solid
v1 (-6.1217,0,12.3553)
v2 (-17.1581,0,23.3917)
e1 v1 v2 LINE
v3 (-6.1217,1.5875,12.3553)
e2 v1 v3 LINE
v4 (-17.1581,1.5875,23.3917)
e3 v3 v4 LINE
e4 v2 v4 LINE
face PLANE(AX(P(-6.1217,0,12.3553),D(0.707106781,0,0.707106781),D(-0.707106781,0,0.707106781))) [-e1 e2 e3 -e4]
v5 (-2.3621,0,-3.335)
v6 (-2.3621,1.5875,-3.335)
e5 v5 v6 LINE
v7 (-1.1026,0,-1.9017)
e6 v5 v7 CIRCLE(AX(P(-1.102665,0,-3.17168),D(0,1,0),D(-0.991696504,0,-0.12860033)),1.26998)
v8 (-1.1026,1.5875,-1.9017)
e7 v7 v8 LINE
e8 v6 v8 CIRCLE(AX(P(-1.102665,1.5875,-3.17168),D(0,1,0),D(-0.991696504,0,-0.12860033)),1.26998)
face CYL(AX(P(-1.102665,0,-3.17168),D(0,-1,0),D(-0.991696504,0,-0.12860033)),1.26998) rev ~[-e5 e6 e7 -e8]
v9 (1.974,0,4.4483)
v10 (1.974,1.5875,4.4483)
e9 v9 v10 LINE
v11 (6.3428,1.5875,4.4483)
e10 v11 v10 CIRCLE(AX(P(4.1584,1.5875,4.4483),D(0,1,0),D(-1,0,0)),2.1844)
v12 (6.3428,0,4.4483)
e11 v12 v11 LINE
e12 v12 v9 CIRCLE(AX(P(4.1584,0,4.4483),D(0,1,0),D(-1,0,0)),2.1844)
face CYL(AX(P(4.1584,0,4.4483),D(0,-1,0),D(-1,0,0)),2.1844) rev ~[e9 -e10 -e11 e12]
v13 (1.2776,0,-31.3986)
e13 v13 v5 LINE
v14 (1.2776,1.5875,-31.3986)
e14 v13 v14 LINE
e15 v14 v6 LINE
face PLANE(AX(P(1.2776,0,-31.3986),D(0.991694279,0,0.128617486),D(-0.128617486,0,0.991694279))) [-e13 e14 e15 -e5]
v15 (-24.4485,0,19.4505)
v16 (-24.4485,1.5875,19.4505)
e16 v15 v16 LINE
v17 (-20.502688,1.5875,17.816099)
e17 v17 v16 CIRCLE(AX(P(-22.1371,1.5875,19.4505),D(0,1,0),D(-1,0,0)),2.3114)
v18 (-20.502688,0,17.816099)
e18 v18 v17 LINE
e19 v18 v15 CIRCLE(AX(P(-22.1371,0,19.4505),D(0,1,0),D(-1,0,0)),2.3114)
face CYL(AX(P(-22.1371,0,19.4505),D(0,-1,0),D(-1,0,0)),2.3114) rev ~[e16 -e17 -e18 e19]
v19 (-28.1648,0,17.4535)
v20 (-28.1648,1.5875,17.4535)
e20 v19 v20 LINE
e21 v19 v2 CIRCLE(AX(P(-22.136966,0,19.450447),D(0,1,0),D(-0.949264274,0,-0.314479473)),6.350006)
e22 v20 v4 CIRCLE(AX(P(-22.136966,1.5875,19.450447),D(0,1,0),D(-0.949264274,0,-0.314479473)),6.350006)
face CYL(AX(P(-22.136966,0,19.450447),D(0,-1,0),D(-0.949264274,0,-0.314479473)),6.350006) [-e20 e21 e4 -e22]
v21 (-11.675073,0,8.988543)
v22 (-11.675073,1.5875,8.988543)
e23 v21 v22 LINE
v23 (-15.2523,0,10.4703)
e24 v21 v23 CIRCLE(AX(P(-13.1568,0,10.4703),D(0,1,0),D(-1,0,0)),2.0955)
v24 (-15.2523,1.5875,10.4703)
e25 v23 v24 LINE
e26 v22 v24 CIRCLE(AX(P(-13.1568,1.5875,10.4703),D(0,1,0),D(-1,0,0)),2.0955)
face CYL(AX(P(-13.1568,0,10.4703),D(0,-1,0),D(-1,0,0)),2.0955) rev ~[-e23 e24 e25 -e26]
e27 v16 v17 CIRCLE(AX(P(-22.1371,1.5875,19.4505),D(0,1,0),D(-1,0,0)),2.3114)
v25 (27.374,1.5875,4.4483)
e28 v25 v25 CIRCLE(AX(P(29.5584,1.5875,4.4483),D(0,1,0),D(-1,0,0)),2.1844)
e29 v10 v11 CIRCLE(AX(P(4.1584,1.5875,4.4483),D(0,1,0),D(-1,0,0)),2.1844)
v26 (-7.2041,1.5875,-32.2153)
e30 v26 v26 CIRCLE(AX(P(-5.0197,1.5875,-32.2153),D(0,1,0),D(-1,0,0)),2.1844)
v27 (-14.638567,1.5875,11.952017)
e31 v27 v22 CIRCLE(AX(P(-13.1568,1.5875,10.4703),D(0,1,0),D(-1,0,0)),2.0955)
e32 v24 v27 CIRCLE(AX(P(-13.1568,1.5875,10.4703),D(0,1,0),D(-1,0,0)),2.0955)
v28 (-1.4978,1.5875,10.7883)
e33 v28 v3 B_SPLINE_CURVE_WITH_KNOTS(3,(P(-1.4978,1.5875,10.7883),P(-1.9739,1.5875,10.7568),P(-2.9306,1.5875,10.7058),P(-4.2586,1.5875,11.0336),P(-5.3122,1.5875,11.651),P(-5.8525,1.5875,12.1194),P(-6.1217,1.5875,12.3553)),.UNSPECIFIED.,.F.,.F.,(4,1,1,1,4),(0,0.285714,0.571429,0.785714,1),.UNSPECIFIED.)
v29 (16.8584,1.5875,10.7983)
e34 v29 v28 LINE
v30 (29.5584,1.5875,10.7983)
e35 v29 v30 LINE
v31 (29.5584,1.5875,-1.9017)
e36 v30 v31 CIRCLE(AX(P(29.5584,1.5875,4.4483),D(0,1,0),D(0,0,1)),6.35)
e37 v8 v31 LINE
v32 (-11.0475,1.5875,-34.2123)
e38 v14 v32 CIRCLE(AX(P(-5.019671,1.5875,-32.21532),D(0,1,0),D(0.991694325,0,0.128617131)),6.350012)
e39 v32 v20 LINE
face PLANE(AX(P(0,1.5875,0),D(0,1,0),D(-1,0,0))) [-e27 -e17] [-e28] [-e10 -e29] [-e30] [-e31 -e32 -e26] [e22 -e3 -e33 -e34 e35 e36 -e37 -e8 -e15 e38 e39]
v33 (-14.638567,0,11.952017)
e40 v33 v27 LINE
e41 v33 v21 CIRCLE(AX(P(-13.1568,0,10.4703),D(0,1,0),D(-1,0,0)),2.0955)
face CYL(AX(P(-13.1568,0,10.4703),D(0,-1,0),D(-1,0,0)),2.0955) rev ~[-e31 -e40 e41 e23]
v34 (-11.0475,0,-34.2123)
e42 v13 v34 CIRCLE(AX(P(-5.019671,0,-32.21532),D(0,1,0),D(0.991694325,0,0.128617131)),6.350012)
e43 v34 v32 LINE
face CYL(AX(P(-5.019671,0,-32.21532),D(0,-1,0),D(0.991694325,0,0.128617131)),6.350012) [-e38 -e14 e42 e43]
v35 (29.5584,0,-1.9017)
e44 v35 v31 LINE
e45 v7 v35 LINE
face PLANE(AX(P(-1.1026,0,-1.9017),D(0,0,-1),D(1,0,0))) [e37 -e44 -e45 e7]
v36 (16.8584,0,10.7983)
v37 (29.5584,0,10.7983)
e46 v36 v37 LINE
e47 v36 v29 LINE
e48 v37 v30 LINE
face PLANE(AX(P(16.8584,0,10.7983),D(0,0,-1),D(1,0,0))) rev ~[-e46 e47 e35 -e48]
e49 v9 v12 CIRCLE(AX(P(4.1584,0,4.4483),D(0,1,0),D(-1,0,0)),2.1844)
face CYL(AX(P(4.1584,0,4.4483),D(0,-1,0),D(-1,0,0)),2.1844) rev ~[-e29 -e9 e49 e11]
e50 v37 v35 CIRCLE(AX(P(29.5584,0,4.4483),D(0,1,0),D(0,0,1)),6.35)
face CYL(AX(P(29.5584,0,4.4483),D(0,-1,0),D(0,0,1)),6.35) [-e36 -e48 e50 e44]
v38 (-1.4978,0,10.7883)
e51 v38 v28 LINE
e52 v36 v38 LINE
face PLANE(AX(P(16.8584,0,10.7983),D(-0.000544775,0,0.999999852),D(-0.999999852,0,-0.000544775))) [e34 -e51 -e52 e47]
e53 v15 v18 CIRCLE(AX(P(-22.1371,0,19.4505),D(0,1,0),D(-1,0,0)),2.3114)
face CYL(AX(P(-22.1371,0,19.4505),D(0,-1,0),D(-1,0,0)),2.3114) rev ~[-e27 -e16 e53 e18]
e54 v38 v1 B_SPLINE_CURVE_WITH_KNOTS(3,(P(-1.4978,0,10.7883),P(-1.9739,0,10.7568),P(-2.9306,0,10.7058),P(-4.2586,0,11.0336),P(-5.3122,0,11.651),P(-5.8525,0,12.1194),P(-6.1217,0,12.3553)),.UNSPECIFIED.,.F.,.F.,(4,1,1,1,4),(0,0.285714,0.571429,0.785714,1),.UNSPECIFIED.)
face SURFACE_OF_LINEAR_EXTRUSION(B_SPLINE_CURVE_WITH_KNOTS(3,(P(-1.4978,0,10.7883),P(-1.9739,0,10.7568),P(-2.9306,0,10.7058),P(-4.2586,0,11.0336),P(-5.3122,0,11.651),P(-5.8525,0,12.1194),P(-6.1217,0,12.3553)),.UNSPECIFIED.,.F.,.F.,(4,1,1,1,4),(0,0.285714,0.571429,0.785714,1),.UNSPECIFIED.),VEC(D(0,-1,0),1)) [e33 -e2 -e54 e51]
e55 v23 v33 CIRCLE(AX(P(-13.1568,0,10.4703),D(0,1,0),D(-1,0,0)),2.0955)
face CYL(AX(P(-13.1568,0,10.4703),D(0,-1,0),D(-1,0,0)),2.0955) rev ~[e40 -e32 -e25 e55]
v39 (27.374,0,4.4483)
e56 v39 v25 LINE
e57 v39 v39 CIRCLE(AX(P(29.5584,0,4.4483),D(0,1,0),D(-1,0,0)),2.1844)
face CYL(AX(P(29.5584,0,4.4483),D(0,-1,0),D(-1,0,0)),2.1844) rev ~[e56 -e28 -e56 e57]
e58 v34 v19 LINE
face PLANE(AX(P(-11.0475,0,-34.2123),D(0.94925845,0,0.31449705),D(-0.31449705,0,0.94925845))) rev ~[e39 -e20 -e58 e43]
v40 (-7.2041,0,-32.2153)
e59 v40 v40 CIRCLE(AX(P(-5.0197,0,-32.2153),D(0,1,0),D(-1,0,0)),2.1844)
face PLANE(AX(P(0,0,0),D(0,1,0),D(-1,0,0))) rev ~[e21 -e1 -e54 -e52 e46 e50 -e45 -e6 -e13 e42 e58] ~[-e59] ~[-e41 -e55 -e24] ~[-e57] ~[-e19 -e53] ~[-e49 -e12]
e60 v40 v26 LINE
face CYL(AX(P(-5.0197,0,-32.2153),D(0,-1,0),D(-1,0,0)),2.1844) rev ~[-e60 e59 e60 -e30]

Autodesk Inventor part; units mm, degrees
ref_plane "YZ Plane" through (0, 0, 0) normal (1, 0, 0) x (0, 1, 0)
ref_plane "XZ Plane" through (0, 0, 0) normal (0, 1, 0) x (-1, 0, 0)
ref_plane "XY Plane" through (0, 0, 0) normal (0, 0, 1) x (1, 0, 0)
sketch "main" plane through (0, 0, 0) normal (0, 0, 1) x (1, 0, 0)
  circle A0 centre (38.7007, 32.2161) radius 2.3114
  circle A1 centre (29.7205, 23.2358) radius 2.3114
  circle A2 centre (13.1029, 17.5349) radius 2.1844
  circle A3 centre (22.281, -19.1287) radius 2.1844
  circle A4 centre (22.281, -19.1287) radius 6.35
  spline S0 degree 3 poles (34.2106, 36.7062) (34.5464, 37.0421) (35.2145, 37.7033) (36.4253, 38.4715) (37.8969, 38.8878) (39.5045, 38.8877) (40.9769, 38.4718) (42.187, 37.7033) (42.855, 37.0421) (43.1908, 36.7062) knots 0 0 0 0 0.123366 0.246731 0.370097 0.493463 0.616828 0.740194 0.86356 0.86356 0.86356 0.86356
  spline S1 degree 3 poles (43.1908, 36.7062) (43.5267, 36.3703) (44.188, 35.7023) (44.9562, 34.4914) (45.3725, 33.0199) (45.3723, 31.4123) (44.9564, 29.9399) (44.1879, 28.7298) (43.5267, 28.0618) (43.1908, 27.7259) knots 0 0 0 0 0.123366 0.246731 0.370097 0.493463 0.616828 0.740194 0.86356 0.86356 0.86356 0.86356
  line L0 (28.3198, -21.092) -> (45.0845, 30.4731)
  line L1 (16.2421, -17.1653) -> (28.0767, 19.2357)
  line L2 (24.0195, 11.1849) -> (0.4029, 11.1849)
  spline S2 degree 3 poles (28.5097, 13.0448) (28.2578, 12.7929) (27.7518, 12.2921) (26.7458, 11.6097) (25.4482, 11.197) (24.4945, 11.1849) (24.0195, 11.1849) knots 0 0 0 0 0.214286 0.428571 0.714286 1 1 1 1
  point P0 (28.3293, 11.5879)
  dimension "d0" = 12.7
sketch "Sketch1" plane through (0, 0, 0) normal (0, 1, 0) x (-1, 0, 0)
  circle A0 centre (22.1371, 19.4505) radius 2.3114
  circle A1 centre (-4.1584, 4.4483) radius 2.1844
  circle A2 centre (5.0197, -32.2153) radius 2.1844
  arc A3 (-1.2776, -31.3986) -> (11.0475, -34.2123) centre (5.0197, -32.2153) ccw
  line L0 (11.0475, -34.2123) -> (28.1648, 17.4535)
  line L1 (-1.2776, -31.3986) -> (2.3621, -3.335)
  line L2 (1.1026, -1.9017) -> (-29.5584, -1.9017)
  line L3 (6.1217, 12.3553) -> (17.1581, 23.3917)
  spline S0 degree 3 poles (1.4978, 10.7883) (1.9739, 10.7568) (2.9306, 10.7058) (4.2586, 11.0336) (5.3122, 11.651) (5.8525, 12.1194) (6.1217, 12.3553) knots 0 0 0 0 0.285714 0.571429 0.785714 1 1 1 1
  line L4 (-16.8584, 10.7983) -> (1.4978, 10.7883)
  arc A4 (2.3621, -3.335) -> (1.1026, -1.9017) centre (1.1026, -3.1717) ccw
  line L5 (-16.8584, 10.7983) -> (-29.5584, 10.7983)
  circle A5 centre (-29.5584, 4.4483) radius 2.1844
  arc A6 (28.1648, 17.4535) -> (17.1581, 23.3917) centre (22.1371, 19.4505) ccw
  arc A7 (-29.5584, 10.7983) -> (-29.5584, -1.9017) centre (-29.5584, 4.4483) ccw
  circle A8 centre (13.1568, 10.4703) radius 2.0955
  line L6 (-29.5584, 4.4483) -> (7.1348, 4.4483)
  line L7 (7.1348, 4.4483) -> (22.1371, 19.4505)
  dimension "d2" = 12.7
  dimension "d3" = 1.27
  dimension "d10" = 6.35
  dimension "d15" = 135
extrude "Extrusion1" add sketch "Sketch1" along normal blind 1.5875
equation "\"BendRadius\" = Thickness"
equation "\"BendReliefWidth\" = Thickness"
equation "\"BendReliefDepth\" = 0.5 * Thickness"
equation "\"CornerReliefSize\" = 4 * Thickness"
equation "\"MinimumRemnant\" = 2 * Thickness"
equation "\"TransitionRadius\" = BendRadius"
equation "\"JacobiRadiusSize\" = BendRadius"
equation "\"GapSize\" = Thickness"
equation "\"Thickness\" = 3.048"
properties part number "join-gusset_offset" material "Acetal Resin, Black"
